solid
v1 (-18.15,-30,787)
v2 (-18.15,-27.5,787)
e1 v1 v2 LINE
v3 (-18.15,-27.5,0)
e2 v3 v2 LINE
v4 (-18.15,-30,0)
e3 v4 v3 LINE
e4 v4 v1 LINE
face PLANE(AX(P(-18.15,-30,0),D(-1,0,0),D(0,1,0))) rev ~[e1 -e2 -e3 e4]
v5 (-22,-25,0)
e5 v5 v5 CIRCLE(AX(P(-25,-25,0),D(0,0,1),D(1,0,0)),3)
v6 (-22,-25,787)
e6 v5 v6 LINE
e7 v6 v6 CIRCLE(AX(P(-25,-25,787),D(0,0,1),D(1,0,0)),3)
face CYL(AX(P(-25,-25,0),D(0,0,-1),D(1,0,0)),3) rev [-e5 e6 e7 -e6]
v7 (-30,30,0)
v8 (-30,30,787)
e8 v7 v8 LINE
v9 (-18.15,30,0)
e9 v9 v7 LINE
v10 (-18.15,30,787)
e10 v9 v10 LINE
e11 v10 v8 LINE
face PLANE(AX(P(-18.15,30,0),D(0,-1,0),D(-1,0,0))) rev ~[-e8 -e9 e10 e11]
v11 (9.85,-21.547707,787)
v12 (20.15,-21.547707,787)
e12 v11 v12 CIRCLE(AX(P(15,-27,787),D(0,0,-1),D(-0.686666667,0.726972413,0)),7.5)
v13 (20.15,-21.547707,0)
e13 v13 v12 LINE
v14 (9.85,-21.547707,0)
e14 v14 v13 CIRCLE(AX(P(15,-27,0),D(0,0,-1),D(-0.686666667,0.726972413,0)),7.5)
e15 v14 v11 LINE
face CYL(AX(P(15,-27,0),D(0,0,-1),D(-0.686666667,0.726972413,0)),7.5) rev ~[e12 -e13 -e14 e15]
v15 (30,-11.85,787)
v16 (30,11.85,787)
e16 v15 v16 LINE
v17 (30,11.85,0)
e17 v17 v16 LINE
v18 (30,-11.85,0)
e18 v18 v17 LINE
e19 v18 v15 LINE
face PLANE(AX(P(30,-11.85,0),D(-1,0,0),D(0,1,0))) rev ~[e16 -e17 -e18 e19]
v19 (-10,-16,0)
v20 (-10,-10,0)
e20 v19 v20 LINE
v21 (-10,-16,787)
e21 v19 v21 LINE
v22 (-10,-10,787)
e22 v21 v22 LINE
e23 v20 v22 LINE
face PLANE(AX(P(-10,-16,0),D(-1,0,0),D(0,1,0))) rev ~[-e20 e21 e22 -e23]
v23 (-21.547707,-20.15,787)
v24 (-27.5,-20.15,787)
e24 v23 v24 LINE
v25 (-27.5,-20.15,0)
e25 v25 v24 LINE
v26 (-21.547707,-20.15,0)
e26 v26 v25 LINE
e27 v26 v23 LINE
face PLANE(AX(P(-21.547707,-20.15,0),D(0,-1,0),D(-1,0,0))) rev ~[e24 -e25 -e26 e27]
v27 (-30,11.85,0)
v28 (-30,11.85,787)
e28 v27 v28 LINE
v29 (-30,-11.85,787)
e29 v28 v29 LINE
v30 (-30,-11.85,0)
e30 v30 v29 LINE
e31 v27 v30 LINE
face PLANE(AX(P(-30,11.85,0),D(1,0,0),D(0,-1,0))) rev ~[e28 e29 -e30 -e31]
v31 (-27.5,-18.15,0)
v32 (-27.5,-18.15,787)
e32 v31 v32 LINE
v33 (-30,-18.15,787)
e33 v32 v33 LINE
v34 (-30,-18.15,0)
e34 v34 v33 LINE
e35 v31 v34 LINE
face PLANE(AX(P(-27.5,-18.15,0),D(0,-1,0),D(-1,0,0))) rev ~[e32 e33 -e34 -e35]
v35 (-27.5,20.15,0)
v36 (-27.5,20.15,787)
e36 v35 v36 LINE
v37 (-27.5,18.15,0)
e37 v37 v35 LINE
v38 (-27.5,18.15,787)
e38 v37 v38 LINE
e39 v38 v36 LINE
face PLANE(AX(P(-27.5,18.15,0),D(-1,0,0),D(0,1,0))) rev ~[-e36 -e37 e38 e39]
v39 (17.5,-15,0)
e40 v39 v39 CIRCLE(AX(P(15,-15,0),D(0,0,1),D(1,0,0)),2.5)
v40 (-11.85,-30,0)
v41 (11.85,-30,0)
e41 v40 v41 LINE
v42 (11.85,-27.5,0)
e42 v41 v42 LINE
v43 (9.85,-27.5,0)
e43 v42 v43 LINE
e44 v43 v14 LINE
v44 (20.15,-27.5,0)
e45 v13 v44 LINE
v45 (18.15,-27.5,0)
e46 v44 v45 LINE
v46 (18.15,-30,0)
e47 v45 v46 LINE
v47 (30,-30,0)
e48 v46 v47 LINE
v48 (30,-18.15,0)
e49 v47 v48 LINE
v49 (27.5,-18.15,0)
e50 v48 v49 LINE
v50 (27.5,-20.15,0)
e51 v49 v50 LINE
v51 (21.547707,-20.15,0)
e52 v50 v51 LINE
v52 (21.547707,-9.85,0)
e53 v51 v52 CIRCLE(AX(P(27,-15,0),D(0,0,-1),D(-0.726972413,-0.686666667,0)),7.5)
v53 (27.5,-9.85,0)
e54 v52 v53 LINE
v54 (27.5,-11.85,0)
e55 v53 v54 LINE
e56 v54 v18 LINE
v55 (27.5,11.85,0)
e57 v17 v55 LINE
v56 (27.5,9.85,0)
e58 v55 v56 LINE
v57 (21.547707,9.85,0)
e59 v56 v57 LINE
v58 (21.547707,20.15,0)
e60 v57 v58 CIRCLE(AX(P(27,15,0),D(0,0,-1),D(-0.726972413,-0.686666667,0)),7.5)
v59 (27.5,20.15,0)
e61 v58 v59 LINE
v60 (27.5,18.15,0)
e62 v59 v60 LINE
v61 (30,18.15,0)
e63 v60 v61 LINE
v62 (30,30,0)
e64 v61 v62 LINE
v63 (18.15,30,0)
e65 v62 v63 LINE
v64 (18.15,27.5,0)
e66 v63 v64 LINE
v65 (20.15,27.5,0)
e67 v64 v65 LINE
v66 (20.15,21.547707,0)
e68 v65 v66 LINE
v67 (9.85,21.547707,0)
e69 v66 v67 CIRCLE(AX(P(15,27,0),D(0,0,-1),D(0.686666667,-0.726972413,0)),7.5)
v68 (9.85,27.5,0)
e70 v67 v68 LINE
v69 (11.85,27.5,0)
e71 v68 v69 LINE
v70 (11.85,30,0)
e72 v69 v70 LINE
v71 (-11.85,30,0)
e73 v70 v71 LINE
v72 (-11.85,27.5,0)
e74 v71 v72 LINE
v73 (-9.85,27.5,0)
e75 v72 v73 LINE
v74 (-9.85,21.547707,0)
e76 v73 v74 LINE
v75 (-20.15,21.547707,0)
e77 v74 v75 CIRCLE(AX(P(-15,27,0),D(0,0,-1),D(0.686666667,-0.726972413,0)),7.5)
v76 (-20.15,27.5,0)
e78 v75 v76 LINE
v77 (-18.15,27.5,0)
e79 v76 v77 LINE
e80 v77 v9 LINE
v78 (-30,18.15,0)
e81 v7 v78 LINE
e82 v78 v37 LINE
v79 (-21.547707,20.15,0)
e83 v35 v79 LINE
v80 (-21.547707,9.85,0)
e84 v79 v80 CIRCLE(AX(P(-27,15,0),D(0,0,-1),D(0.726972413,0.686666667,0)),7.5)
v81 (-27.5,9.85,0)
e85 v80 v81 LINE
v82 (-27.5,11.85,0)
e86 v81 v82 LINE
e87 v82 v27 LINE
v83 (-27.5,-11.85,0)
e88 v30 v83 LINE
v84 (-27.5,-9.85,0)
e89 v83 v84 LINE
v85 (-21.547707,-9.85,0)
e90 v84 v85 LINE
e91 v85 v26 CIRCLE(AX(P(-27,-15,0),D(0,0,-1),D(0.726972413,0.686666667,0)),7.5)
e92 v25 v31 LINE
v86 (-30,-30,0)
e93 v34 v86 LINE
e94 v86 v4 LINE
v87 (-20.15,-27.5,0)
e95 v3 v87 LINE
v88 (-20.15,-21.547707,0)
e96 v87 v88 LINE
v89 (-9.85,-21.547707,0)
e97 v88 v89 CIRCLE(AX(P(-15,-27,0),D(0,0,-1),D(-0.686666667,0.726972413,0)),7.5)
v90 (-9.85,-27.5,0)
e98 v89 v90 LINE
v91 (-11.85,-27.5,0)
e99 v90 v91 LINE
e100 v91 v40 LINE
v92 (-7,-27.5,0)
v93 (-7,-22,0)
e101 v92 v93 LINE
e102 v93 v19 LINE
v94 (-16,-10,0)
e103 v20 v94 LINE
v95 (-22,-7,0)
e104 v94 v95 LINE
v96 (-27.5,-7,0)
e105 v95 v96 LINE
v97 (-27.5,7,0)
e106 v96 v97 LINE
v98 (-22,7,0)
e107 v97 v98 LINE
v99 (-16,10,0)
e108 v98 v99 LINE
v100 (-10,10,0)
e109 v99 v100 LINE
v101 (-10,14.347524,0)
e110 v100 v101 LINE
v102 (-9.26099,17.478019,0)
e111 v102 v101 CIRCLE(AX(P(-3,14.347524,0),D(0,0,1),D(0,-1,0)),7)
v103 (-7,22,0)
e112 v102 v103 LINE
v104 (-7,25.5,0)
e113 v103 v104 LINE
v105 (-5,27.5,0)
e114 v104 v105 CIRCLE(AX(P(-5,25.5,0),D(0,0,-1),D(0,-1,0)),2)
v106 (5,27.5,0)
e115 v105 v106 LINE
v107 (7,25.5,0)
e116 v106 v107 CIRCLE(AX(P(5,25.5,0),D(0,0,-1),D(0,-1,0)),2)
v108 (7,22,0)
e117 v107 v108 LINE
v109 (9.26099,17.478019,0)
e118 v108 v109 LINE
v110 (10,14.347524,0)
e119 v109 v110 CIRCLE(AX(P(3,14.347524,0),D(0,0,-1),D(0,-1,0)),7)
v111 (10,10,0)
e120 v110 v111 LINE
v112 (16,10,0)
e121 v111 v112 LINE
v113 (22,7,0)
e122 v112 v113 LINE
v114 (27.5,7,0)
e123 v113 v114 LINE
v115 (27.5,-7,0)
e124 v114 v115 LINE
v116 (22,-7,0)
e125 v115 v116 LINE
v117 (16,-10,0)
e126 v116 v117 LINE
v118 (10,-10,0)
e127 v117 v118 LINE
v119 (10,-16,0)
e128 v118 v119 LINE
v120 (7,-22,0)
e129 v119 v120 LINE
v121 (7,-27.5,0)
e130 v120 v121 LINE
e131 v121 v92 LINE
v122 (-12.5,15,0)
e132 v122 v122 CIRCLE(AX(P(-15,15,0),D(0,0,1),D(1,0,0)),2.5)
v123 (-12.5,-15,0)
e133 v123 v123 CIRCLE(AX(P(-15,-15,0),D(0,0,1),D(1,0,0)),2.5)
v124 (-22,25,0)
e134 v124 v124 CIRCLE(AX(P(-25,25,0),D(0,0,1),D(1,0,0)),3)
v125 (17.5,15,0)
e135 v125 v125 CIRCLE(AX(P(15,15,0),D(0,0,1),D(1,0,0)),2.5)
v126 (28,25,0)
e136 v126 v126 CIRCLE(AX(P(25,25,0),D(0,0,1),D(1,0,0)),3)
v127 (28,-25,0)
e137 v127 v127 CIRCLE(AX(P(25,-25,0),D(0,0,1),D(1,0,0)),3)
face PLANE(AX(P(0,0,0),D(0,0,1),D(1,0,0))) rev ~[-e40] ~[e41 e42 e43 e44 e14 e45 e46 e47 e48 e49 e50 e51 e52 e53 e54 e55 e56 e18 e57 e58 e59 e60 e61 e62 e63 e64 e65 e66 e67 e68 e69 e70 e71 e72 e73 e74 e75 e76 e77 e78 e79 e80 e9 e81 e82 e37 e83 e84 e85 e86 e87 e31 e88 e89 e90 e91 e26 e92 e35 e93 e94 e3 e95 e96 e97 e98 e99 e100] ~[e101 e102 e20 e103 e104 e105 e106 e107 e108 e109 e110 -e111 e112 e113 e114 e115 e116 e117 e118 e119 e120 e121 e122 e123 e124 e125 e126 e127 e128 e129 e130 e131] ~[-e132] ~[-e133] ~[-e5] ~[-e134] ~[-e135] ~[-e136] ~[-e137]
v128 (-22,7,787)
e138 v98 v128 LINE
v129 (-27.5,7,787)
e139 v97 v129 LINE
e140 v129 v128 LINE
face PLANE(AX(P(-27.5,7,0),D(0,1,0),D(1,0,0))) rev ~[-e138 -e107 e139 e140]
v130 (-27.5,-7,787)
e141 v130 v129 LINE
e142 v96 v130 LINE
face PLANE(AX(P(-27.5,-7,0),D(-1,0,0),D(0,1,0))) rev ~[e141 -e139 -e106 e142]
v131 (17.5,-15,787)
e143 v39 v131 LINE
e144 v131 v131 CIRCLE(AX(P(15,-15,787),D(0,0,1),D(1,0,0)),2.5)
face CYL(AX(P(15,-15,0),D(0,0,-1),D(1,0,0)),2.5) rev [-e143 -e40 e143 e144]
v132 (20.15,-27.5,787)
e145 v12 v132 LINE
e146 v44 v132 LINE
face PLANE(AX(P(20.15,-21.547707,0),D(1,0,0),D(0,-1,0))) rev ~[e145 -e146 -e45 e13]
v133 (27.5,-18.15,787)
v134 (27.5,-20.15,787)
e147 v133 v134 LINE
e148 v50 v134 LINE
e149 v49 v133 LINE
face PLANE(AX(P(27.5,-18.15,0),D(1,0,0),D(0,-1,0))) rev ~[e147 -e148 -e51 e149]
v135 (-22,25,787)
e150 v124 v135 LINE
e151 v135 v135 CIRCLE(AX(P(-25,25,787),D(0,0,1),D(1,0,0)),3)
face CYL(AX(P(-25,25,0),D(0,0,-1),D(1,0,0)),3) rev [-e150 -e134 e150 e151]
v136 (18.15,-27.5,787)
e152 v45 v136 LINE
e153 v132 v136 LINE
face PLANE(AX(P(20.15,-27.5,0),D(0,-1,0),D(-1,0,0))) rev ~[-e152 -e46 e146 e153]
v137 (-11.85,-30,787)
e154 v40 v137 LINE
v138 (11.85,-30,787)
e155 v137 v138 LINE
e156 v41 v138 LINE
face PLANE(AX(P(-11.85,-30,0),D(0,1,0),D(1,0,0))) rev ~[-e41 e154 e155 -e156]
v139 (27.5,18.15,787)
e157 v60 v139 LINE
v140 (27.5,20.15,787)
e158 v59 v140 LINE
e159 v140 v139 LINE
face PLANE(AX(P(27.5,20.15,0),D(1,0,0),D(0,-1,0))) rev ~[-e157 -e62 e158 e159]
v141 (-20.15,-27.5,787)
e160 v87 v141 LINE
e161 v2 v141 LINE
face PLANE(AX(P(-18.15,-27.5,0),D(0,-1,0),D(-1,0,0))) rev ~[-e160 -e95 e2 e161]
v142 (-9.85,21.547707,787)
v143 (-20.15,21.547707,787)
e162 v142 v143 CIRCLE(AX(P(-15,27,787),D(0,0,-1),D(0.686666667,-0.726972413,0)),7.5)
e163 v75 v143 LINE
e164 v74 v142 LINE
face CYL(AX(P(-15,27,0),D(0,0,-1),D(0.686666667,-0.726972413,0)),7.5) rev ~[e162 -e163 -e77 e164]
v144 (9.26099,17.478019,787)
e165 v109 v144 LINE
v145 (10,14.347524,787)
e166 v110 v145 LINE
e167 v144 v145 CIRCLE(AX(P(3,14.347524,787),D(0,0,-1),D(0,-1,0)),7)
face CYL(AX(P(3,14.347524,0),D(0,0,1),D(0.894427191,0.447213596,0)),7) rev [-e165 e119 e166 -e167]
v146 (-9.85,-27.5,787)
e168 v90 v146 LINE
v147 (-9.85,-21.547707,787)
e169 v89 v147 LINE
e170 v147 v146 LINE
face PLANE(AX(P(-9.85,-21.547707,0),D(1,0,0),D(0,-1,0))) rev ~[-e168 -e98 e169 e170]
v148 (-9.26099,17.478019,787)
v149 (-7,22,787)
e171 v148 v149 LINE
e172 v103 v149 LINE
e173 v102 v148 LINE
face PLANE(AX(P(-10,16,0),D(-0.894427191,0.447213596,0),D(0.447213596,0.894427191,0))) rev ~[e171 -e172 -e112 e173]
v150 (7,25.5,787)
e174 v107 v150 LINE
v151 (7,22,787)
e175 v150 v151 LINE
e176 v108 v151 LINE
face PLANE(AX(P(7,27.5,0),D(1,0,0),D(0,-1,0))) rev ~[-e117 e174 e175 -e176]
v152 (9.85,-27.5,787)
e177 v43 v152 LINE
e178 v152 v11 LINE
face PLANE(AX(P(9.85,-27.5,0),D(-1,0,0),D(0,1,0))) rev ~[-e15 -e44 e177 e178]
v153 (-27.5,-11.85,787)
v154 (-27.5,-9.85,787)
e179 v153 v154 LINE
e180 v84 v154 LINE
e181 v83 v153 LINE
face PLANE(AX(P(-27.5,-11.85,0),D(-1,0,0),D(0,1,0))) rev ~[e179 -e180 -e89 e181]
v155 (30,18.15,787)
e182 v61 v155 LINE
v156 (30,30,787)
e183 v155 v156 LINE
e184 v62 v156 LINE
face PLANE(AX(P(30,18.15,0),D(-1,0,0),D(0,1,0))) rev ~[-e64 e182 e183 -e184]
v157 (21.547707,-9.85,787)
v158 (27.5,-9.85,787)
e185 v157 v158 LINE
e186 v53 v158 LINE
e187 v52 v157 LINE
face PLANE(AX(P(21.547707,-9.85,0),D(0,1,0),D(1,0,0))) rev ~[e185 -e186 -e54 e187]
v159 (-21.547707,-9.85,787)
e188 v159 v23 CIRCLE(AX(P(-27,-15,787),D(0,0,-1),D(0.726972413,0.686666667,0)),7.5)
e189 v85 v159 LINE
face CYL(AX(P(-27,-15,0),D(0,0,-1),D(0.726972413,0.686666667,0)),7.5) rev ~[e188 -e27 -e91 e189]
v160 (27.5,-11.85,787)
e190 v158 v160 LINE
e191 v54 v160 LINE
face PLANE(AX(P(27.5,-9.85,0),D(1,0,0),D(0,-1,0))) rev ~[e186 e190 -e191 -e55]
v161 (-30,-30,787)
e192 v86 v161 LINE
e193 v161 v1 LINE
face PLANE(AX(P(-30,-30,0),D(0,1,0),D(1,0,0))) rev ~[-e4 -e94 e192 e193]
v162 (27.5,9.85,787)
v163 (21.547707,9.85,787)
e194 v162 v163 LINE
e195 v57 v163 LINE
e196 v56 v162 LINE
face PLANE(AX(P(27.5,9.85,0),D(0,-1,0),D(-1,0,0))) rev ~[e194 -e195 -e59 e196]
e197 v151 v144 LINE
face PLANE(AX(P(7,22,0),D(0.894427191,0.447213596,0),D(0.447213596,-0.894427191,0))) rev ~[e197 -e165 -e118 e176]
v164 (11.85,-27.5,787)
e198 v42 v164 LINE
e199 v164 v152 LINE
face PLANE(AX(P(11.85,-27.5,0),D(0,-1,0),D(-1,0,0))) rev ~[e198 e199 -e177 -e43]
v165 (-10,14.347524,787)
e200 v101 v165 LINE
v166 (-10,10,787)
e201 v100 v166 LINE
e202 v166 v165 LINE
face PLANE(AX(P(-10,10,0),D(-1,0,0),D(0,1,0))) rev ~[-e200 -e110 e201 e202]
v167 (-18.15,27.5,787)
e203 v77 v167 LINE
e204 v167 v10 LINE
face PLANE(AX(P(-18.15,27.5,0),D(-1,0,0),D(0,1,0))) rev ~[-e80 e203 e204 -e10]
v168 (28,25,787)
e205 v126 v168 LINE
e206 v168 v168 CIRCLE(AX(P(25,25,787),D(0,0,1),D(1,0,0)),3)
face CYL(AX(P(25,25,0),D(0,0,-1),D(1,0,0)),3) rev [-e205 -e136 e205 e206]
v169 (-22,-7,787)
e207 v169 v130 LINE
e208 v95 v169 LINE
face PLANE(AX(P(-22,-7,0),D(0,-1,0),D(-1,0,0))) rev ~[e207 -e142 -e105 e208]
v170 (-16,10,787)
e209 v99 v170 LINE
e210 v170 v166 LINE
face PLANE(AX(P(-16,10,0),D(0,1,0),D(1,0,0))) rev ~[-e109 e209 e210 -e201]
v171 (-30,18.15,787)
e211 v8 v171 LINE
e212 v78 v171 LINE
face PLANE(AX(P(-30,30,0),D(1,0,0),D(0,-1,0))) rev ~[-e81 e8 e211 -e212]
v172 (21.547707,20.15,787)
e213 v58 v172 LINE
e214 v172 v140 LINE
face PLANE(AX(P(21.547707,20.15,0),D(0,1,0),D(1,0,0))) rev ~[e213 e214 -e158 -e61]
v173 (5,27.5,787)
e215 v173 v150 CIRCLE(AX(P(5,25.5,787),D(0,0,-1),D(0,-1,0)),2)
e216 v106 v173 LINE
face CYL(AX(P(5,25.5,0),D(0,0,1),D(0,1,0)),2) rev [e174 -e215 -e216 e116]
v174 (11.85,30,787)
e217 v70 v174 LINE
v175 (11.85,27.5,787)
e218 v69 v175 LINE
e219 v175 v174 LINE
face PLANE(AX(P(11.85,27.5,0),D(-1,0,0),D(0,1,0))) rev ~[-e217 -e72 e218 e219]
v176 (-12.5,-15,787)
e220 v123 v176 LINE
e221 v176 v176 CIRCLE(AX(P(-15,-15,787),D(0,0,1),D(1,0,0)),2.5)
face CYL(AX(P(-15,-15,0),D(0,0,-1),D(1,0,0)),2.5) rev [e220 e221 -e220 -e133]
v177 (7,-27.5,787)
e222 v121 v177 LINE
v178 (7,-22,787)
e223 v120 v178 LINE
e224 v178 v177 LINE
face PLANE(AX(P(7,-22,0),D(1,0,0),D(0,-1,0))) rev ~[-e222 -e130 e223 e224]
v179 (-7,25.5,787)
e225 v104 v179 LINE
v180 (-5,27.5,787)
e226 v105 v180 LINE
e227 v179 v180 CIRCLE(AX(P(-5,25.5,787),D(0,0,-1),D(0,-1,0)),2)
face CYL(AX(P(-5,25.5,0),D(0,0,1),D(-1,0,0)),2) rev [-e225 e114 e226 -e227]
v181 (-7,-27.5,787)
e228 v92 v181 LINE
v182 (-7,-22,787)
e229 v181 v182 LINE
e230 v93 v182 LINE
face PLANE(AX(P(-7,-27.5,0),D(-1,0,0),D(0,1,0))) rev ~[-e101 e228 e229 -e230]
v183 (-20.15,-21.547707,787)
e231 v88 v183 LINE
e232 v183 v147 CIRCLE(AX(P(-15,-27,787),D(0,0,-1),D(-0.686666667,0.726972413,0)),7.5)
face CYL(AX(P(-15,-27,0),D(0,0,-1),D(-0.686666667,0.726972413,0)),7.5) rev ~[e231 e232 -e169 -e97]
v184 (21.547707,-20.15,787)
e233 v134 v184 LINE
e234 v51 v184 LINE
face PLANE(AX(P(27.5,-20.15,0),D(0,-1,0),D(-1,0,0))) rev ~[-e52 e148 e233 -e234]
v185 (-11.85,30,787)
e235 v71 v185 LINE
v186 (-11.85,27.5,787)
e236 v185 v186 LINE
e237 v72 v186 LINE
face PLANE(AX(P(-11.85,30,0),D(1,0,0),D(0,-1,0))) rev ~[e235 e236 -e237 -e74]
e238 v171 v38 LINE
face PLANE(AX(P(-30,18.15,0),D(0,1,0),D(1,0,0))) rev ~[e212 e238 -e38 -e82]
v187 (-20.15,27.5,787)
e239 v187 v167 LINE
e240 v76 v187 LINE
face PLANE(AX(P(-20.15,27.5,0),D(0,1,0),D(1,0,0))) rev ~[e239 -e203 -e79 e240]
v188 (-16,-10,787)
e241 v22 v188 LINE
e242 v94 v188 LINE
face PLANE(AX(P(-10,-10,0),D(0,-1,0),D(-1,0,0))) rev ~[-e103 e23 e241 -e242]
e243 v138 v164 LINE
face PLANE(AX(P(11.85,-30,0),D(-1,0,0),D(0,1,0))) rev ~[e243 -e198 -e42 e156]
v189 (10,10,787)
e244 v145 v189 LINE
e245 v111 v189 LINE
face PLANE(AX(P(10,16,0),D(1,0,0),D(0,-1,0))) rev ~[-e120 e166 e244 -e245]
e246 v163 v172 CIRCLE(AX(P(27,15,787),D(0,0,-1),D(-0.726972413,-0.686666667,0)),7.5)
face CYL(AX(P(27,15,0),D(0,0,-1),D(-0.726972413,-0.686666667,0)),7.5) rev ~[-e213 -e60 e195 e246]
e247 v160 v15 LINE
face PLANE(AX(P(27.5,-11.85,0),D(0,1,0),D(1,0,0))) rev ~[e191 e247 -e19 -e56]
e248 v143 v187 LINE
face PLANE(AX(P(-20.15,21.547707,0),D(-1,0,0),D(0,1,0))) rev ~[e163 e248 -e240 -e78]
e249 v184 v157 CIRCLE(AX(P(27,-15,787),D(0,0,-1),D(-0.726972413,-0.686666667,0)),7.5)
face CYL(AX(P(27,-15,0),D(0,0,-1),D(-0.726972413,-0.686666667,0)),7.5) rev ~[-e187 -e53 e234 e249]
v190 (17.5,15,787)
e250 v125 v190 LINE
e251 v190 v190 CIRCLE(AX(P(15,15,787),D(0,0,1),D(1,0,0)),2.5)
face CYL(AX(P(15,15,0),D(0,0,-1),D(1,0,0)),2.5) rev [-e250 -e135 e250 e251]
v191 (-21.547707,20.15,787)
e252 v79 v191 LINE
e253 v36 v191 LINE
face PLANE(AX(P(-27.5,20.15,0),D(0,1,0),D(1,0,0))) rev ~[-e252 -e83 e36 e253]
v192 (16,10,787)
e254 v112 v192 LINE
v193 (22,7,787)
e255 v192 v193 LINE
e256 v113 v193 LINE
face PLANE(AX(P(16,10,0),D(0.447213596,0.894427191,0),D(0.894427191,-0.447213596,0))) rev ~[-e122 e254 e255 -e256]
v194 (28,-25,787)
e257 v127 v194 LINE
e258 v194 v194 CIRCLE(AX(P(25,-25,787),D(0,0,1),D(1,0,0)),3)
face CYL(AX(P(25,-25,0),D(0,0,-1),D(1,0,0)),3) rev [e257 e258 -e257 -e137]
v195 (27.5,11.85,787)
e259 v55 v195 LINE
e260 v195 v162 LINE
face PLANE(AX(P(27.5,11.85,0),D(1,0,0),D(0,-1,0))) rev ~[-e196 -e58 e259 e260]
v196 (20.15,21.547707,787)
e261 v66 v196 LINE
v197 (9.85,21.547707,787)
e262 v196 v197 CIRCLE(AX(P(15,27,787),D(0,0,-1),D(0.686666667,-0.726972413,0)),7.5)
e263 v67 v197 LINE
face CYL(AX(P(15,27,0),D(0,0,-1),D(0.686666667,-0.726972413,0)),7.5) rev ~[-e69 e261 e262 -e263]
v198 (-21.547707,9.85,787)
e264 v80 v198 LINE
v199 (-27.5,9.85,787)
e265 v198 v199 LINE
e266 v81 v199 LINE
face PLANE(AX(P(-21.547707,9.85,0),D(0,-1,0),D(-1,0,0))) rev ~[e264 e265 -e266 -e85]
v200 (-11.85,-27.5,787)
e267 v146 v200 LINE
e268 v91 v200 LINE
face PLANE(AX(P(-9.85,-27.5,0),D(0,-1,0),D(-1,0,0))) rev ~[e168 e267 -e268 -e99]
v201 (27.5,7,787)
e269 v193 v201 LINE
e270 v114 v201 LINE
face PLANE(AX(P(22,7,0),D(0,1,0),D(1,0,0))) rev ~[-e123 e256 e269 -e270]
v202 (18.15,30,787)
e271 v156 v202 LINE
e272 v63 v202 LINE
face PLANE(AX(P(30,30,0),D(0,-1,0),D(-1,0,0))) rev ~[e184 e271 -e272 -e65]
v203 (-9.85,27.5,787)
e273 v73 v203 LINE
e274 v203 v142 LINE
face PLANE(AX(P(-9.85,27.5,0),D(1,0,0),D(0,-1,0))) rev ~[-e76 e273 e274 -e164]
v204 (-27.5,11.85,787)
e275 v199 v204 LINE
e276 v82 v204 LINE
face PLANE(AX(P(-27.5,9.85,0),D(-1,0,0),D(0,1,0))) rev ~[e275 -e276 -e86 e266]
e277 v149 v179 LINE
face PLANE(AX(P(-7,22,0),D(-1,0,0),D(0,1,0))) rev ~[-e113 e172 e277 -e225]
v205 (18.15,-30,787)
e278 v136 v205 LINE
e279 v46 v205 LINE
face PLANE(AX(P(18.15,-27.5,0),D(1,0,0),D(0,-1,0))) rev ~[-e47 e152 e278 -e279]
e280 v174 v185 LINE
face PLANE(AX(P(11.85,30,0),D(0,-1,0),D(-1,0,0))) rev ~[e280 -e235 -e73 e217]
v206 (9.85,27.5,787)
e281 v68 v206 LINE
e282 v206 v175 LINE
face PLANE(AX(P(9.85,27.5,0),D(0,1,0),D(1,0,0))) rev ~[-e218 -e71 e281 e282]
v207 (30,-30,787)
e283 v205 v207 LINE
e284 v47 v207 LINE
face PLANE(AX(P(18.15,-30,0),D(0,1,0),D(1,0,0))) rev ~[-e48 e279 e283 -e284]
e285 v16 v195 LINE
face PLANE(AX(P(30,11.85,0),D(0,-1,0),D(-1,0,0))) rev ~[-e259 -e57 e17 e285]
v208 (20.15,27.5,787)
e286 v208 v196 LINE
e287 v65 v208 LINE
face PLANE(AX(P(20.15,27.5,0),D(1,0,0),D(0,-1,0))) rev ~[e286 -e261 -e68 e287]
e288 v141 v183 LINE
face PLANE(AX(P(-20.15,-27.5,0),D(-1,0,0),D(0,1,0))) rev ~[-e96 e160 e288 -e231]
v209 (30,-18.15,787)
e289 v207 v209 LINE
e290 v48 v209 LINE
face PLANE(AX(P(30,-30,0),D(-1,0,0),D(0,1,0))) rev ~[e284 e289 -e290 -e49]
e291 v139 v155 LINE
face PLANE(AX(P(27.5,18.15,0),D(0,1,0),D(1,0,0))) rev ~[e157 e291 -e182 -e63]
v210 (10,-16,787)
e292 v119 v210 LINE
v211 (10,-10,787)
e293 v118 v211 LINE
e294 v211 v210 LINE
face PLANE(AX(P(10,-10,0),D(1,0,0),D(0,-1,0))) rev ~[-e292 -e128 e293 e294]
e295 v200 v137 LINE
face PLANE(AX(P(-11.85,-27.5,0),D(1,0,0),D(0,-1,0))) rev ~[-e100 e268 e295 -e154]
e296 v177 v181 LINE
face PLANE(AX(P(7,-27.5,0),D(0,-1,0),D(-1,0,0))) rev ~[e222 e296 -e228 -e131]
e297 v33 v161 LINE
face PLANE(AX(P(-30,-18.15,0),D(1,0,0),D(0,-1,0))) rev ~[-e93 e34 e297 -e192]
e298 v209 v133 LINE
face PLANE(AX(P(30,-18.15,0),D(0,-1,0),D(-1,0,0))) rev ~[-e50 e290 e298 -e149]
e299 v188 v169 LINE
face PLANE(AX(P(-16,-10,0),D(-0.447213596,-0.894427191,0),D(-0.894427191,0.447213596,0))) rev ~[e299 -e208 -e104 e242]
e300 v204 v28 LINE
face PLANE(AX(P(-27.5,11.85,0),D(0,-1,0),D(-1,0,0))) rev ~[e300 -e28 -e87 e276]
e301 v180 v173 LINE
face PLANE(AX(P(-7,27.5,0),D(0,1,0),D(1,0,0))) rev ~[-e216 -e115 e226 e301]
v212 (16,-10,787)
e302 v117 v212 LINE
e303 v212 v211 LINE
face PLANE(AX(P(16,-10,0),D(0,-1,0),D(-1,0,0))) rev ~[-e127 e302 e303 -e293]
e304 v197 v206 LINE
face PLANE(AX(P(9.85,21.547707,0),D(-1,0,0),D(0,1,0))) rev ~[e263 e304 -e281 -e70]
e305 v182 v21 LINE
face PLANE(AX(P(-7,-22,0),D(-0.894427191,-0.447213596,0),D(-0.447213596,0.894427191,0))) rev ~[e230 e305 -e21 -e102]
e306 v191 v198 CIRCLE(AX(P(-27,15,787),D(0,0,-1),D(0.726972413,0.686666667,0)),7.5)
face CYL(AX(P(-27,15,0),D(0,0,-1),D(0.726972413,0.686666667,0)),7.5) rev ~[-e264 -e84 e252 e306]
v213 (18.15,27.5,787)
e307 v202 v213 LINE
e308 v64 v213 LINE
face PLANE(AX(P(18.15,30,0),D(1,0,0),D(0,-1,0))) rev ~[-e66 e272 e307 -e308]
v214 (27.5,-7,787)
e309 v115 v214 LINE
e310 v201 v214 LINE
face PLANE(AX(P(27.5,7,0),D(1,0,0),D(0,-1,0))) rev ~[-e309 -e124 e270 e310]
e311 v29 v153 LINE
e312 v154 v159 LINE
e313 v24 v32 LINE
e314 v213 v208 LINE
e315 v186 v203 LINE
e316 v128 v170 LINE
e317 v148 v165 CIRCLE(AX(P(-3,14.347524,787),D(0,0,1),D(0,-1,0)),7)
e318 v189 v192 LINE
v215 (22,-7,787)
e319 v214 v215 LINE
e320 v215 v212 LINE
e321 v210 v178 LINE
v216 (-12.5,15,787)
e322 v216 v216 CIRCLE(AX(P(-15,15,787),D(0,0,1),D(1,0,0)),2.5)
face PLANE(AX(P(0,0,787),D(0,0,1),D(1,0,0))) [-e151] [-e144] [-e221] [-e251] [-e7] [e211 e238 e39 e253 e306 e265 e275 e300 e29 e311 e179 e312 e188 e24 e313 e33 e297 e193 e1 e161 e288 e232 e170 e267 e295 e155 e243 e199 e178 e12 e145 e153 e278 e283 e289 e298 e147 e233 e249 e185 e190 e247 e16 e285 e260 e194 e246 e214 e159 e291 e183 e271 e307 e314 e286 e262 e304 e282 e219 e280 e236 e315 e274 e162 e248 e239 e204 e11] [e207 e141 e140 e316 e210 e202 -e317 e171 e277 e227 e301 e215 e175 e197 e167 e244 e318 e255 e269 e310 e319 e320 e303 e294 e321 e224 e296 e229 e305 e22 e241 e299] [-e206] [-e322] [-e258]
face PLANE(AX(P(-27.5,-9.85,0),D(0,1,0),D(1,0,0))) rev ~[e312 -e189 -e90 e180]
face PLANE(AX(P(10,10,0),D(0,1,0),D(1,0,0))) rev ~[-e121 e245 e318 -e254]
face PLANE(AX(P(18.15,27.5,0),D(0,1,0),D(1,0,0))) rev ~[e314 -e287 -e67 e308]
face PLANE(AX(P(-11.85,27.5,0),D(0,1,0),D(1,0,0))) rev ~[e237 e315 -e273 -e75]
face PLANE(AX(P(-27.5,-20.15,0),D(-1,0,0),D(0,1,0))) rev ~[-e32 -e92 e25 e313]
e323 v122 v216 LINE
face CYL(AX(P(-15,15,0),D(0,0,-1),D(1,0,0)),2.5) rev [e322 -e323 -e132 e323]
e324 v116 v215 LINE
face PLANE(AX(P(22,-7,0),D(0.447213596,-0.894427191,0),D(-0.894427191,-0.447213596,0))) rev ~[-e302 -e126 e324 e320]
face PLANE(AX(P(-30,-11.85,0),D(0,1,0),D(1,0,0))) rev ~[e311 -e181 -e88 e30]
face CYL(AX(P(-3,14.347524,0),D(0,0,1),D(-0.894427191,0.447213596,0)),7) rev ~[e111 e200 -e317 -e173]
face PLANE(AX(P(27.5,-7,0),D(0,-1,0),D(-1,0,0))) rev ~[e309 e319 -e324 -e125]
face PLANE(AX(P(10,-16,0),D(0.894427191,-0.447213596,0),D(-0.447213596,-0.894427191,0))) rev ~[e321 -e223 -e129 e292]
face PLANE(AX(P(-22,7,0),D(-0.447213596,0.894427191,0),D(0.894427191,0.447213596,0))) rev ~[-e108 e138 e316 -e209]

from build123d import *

# Parameters (mm, degrees)
F0_R     = 3
F0_R_2   = 2.5
F1_DEPTH = 787
F2_R     = 2
F3_R     = 7


# Not quite as in the source:
# - a feature names something its author has since deleted; it is built from what else it names


with BuildPart() as f1:
    # F0 (on Top) → F1 (new body)
    with BuildSketch(Plane.XY):
        with BuildLine():
            Line((18.15, -30), (30, -30))
            Line((30, -30), (30, -18.15))
            Line((30, -18.15), (27.5, -18.15))
            Line((27.5, -18.15), (27.5, -20.15))
            Line((27.5, -20.15), (21.5477069044, -20.15))
            ThreePointArc((21.5477069044, -20.15), (19.5, -15), (21.5477069044, -9.85))
            Line((21.5477069044, -9.85), (27.5, -9.85))
            Line((27.5, -9.85), (27.5, -11.85))
            Line((27.5, -11.85), (30, -11.85))
            Line((30, -11.85), (30, 11.85))
            Line((30, 11.85), (27.5, 11.85))
            Line((27.5, 11.85), (27.5, 9.85))
            Line((27.5, 9.85), (21.5477069044, 9.85))
            ThreePointArc((21.5477069044, 9.85), (19.5, 15), (21.5477069044, 20.15))
            Line((21.5477069044, 20.15), (27.5, 20.15))
            Line((27.5, 20.15), (27.5, 18.15))
            Line((27.5, 18.15), (30, 18.15))
            Line((30, 18.15), (30, 30))
            Line((30, 30), (18.15, 30))
            Line((18.15, 30), (18.15, 27.5))
            Line((18.15, 27.5), (20.15, 27.5))
            Line((20.15, 27.5), (20.15, 21.5477069044))
            ThreePointArc((20.15, 21.5477069044), (15, 19.5), (9.85, 21.5477069044))
            Line((9.85, 21.5477069044), (9.85, 27.5))
            Line((9.85, 27.5), (11.85, 27.5))
            Line((11.85, 27.5), (11.85, 30))
            Line((11.85, 30), (-11.85, 30))
            Line((-11.85, 30), (-11.85, 27.5))
            Line((-11.85, 27.5), (-9.85, 27.5))
            Line((-9.85, 27.5), (-9.85, 21.5477069044))
            ThreePointArc((-9.85, 21.5477069044), (-15, 19.5), (-20.15, 21.5477069044))
            Line((-20.15, 21.5477069044), (-20.15, 27.5))
            Line((-20.15, 27.5), (-18.15, 27.5))
            Line((-18.15, 27.5), (-18.15, 30))
            Line((-18.15, 30), (-30, 30))
            Line((-30, 30), (-30, 18.15))
            Line((-30, 18.15), (-27.5, 18.15))
            Line((-27.5, 18.15), (-27.5, 20.15))
            Line((-27.5, 20.15), (-21.5477069044, 20.15))
            ThreePointArc((-21.5477069044, 20.15), (-19.5, 15), (-21.5477069044, 9.85))
            Line((-21.5477069044, 9.85), (-27.5, 9.85))
            Line((-27.5, 9.85), (-27.5, 11.85))
            Line((-27.5, 11.85), (-30, 11.85))
            Line((-30, 11.85), (-30, -11.85))
            Line((-30, -11.85), (-27.5, -11.85))
            Line((-27.5, -11.85), (-27.5, -9.85))
            Line((-27.5, -9.85), (-21.5477069044, -9.85))
            ThreePointArc((-21.5477069044, -9.85), (-19.5, -15), (-21.5477069044, -20.15))
            Line((-21.5477069044, -20.15), (-27.5, -20.15))
            Line((-27.5, -20.15), (-27.5, -18.15))
            Line((-27.5, -18.15), (-30, -18.15))
            Line((-30, -18.15), (-30, -30))
            Line((-30, -30), (-18.15, -30))
            Line((-18.15, -30), (-18.15, -27.5))
            Line((-18.15, -27.5), (-20.15, -27.5))
            Line((-20.15, -27.5), (-20.15, -21.5477069044))
            ThreePointArc((-20.15, -21.5477069044), (-15, -19.5), (-9.85, -21.5477069044))
            Line((-9.85, -21.5477069044), (-9.85, -27.5))
            Line((-9.85, -27.5), (-11.85, -27.5))
            Line((-11.85, -27.5), (-11.85, -30))
            Line((-11.85, -30), (11.85, -30))
            Line((11.85, -30), (11.85, -27.5))
            Line((11.85, -27.5), (9.85, -27.5))
            Line((9.85, -27.5), (9.85, -21.5477069044))
            ThreePointArc((9.85, -21.5477069044), (15, -19.5), (20.15, -21.5477069044))
            Line((20.15, -21.5477069044), (20.15, -27.5))
            Line((20.15, -27.5), (18.15, -27.5))
            Line((18.15, -27.5), (18.15, -30))
        make_face()
        with Locations((-25, -25)):
            Circle(F0_R, mode=Mode.SUBTRACT)
        with Locations((-15, -15)):
            Circle(F0_R_2, mode=Mode.SUBTRACT)
        with Locations((25, -25)):
            Circle(F0_R, mode=Mode.SUBTRACT)
        with Locations((15, -15)):
            Circle(F0_R_2, mode=Mode.SUBTRACT)
        with Locations((-25, 25)):
            Circle(F0_R, mode=Mode.SUBTRACT)
        with Locations((-15, 15)):
            Circle(F0_R_2, mode=Mode.SUBTRACT)
        Polygon((-7, 22), (-7, 27.5), (0, 27.5), (7, 27.5), (7, 22), (10, 16), (10, 10), (16, 10), (22, 7), (27.5, 7), (27.5, 0), (27.5, -7), (22, -7), (16, -10), (10, -10), (10, -16), (7, -22), (7, -27.5), (0, -27.5), (-7, -27.5), (-7, -22), (-10, -16), (-10, -10), (-16, -10), (-22, -7), (-27.5, -7), (-27.5, 0), (-27.5, 7), (-22, 7), (-16, 10), (-10, 10), (-10, 16), align=None, mode=Mode.SUBTRACT)
        with Locations((15, 15)):
            Circle(F0_R_2, mode=Mode.SUBTRACT)
        with Locations((25, 25)):
            Circle(F0_R, mode=Mode.SUBTRACT)
    extrude(amount=F1_DEPTH)

    # F2
    f2_edges = [f1.edges().sort_by_distance(p)[0] for p in [
        (-7, 27.5, 393.5),
        (7, 27.5, 393.5),
    ]]
    fillet(f2_edges, radius=F2_R)

    # F3
    f3_edges = [f1.edges().sort_by_distance(p)[0] for p in [
        (-10, 16, 393.5),
        (10, 16, 393.5),
    ]]
    fillet(f3_edges, radius=F3_R)


solid = f1.part
